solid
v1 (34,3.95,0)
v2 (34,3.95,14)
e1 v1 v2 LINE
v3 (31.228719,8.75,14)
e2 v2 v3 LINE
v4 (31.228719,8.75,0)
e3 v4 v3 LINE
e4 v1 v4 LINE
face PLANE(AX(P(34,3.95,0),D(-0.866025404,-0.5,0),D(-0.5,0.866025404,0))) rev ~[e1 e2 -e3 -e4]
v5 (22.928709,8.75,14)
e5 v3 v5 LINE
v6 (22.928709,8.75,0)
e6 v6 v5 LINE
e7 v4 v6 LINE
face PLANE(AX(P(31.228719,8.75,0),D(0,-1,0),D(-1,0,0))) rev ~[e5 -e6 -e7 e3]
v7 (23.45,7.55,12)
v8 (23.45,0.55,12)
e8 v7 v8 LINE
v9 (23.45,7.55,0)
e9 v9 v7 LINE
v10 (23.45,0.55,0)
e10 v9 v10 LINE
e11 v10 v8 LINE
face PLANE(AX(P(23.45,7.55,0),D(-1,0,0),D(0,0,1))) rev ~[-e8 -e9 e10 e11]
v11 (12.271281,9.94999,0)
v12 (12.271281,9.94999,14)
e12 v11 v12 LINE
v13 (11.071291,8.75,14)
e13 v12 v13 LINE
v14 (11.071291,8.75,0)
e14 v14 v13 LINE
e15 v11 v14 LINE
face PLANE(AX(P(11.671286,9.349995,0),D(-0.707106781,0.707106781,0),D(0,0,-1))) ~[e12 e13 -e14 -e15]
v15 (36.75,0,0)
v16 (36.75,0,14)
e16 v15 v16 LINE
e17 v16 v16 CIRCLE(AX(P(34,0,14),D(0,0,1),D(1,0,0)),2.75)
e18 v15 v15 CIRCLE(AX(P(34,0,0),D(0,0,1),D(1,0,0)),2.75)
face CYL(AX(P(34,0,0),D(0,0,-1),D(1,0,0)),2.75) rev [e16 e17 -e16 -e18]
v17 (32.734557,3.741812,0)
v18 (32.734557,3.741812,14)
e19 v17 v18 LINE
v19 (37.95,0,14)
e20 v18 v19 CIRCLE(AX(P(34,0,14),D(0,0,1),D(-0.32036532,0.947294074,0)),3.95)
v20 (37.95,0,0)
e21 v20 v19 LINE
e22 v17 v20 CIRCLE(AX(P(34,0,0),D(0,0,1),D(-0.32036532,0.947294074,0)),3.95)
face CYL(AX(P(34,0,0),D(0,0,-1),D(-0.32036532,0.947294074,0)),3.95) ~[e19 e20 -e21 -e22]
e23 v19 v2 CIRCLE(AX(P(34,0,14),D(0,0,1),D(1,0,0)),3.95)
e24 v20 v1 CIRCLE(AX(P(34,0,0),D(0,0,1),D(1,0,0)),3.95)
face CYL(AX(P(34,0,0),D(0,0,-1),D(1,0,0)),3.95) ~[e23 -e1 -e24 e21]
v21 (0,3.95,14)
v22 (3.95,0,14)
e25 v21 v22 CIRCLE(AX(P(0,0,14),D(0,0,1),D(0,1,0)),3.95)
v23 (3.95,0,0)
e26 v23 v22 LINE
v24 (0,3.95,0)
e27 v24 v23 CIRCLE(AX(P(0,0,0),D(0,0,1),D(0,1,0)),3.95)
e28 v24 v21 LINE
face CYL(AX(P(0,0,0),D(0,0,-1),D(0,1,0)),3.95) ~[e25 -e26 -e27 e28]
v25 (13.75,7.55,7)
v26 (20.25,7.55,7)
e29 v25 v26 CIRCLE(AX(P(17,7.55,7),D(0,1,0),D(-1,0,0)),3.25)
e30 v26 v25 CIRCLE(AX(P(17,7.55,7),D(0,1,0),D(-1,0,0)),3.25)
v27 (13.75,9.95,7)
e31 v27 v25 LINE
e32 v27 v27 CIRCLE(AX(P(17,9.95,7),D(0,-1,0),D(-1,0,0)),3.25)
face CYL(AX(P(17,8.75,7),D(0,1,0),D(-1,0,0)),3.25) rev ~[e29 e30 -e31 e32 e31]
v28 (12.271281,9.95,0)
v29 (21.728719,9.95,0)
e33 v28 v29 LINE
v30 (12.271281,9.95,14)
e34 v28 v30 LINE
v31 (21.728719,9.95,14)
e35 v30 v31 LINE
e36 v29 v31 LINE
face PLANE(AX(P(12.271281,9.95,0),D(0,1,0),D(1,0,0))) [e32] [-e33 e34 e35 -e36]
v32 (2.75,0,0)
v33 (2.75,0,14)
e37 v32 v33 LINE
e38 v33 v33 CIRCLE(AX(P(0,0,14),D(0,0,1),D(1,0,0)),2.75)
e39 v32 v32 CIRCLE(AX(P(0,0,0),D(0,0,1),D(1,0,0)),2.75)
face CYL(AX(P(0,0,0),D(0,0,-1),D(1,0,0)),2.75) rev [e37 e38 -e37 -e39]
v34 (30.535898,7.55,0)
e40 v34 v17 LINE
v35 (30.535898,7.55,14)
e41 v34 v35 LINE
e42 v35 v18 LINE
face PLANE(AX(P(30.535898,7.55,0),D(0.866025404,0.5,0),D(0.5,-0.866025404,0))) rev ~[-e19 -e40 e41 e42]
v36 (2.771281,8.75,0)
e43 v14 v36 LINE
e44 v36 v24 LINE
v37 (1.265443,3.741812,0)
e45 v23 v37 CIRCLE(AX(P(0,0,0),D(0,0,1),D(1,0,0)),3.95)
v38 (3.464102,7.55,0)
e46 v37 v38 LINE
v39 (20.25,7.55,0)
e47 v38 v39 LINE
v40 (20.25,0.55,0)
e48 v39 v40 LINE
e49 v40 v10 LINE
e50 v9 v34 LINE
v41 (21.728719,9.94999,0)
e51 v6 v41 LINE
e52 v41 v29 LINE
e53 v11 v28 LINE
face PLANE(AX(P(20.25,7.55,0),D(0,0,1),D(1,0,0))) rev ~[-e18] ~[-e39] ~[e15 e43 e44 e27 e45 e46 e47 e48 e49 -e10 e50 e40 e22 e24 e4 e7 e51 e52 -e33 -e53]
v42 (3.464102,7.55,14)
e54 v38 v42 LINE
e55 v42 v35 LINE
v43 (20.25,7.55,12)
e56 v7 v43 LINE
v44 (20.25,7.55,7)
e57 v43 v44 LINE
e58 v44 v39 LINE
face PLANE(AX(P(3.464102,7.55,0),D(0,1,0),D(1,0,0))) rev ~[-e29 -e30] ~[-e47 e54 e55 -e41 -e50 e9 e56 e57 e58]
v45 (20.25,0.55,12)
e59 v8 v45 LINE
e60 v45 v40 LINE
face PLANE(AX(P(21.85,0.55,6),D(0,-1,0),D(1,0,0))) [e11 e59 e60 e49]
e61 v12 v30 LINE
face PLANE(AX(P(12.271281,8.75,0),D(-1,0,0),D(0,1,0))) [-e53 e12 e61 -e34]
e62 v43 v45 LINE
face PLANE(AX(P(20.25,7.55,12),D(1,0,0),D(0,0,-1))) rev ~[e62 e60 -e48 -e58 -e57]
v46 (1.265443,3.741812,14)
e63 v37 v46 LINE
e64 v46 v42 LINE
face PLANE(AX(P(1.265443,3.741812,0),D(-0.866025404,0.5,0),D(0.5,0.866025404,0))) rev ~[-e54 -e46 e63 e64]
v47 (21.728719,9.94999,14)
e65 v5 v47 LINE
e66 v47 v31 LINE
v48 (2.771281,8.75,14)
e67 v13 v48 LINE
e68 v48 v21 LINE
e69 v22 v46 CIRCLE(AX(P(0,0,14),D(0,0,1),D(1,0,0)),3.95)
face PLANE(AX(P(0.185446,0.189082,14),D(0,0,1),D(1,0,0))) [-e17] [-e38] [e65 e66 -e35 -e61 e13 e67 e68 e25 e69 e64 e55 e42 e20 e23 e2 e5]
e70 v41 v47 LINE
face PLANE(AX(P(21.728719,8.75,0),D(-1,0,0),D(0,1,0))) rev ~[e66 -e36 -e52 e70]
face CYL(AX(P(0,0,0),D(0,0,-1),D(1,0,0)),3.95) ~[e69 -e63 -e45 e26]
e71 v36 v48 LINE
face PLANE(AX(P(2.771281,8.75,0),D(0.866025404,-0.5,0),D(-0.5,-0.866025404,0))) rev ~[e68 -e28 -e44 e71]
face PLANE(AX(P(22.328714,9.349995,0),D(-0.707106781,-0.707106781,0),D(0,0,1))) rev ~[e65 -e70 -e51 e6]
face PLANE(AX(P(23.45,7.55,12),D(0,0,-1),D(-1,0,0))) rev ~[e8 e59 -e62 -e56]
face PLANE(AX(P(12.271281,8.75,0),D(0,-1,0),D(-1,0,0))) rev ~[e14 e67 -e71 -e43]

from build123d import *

# Parameters (mm, degrees)
F0_R     = 2.75
F0_W     = 9.4574374158
F0_H     = 1.2
F1_DEPTH = 14
F2_R     = 3.25
F3_DEPTH = 54
F4_DEPTH = 25
F5_SIZE  = 1.19999
F7_DEPTH = 7


# Not quite as in the source:
# - a fillet or chamfer is up to 0.001 mm smaller than in the source, because OpenCascade refuses the exact size


with BuildPart() as f1:
    # F0 (on Top) → F1 (new body)
    with BuildSketch(Plane.XY):
        with BuildLine():
            ThreePointArc((0, 3.95), (-2.7930717857, -2.7930717857), (3.95, 0))
            ThreePointArc((3.95, 0), (3.2094391954, 2.302607229), (1.2654430121, 3.7418115911))
            ThreePointArc((1.2654430121, 3.7418115911), (0.6412270328, 3.8976054049), (0, 3.95))
        make_face()
        Circle(F0_R, mode=Mode.SUBTRACT)
        with BuildLine():
            ThreePointArc((0, 3.95), (0.6412270328, 3.8976054049), (1.2654430121, 3.7418115911))
            Line((1.2654430121, 3.7418115911), (3.4641016151, 7.55))
            Line((3.4641016151, 7.55), (30.5358983849, 7.55))
            Line((30.5358983849, 7.55), (32.7345569879, 3.7418115911))
            ThreePointArc((32.7345569879, 3.7418115911), (33.3587729672, 3.8976054049), (34, 3.95))
            Line((34, 3.95), (31.2287187079, 8.75))
            Line((31.2287187079, 8.75), (21.7287187079, 8.75))
            Line((21.7287187079, 8.75), (12.2712812921, 8.75))
            Line((12.2712812921, 8.75), (2.7712812921, 8.75))
            Line((2.7712812921, 8.75), (0, 3.95))
        make_face()
        with Locations((17, 9.35)):
            Rectangle(F0_W, F0_H)
        with BuildLine():
            ThreePointArc((34, 3.95), (33.3587729672, 3.8976054049), (32.7345569879, 3.7418115911))
            ThreePointArc((32.7345569879, 3.7418115911), (31.697392771, -3.2094391954), (37.95, 0))
            ThreePointArc((37.95, 0), (36.7930717857, 2.7930717857), (34, 3.95))
        make_face()
        with Locations((34, 0)):
            Circle(F0_R, mode=Mode.SUBTRACT)
    extrude(amount=F1_DEPTH)

    # F2 (on face) → F3 (cut)
    with BuildSketch(Plane(origin=(0, 8.75, 0), x_dir=(-1, 0, 0), z_dir=(0, 1, 0))):
        with Locations((-17, 7)):
            Circle(F2_R)
    extrude(amount=-F3_DEPTH, mode=Mode.SUBTRACT)

    # F4 (cut): a face of the model
    f4_faces = [f1.faces().sort_by_distance(p)[0] for p in [
        (17, 8.75, 7),
    ]]
    extrude(f4_faces, amount=-F4_DEPTH, mode=Mode.SUBTRACT)

    # F5 (size 1.2 in the source; OpenCascade refuses exactly that, so slightly less here)
    f5_edges = [f1.edges().sort_by_distance(p)[0] for p in [
        (21.728719, 8.75, 7),
        (12.271281, 8.75, 7),
    ]]
    chamfer(f5_edges, length=F5_SIZE)

    # F6 (on face) → F7 (join)
    with BuildSketch(Plane.XZ.offset(-7.55)):
        Polygon((20.25, 0), (23.45, 0), (23.45, 12), (20.25, 12), (20.25, 7), align=None)
    extrude(amount=F7_DEPTH)


solid = f1.part
